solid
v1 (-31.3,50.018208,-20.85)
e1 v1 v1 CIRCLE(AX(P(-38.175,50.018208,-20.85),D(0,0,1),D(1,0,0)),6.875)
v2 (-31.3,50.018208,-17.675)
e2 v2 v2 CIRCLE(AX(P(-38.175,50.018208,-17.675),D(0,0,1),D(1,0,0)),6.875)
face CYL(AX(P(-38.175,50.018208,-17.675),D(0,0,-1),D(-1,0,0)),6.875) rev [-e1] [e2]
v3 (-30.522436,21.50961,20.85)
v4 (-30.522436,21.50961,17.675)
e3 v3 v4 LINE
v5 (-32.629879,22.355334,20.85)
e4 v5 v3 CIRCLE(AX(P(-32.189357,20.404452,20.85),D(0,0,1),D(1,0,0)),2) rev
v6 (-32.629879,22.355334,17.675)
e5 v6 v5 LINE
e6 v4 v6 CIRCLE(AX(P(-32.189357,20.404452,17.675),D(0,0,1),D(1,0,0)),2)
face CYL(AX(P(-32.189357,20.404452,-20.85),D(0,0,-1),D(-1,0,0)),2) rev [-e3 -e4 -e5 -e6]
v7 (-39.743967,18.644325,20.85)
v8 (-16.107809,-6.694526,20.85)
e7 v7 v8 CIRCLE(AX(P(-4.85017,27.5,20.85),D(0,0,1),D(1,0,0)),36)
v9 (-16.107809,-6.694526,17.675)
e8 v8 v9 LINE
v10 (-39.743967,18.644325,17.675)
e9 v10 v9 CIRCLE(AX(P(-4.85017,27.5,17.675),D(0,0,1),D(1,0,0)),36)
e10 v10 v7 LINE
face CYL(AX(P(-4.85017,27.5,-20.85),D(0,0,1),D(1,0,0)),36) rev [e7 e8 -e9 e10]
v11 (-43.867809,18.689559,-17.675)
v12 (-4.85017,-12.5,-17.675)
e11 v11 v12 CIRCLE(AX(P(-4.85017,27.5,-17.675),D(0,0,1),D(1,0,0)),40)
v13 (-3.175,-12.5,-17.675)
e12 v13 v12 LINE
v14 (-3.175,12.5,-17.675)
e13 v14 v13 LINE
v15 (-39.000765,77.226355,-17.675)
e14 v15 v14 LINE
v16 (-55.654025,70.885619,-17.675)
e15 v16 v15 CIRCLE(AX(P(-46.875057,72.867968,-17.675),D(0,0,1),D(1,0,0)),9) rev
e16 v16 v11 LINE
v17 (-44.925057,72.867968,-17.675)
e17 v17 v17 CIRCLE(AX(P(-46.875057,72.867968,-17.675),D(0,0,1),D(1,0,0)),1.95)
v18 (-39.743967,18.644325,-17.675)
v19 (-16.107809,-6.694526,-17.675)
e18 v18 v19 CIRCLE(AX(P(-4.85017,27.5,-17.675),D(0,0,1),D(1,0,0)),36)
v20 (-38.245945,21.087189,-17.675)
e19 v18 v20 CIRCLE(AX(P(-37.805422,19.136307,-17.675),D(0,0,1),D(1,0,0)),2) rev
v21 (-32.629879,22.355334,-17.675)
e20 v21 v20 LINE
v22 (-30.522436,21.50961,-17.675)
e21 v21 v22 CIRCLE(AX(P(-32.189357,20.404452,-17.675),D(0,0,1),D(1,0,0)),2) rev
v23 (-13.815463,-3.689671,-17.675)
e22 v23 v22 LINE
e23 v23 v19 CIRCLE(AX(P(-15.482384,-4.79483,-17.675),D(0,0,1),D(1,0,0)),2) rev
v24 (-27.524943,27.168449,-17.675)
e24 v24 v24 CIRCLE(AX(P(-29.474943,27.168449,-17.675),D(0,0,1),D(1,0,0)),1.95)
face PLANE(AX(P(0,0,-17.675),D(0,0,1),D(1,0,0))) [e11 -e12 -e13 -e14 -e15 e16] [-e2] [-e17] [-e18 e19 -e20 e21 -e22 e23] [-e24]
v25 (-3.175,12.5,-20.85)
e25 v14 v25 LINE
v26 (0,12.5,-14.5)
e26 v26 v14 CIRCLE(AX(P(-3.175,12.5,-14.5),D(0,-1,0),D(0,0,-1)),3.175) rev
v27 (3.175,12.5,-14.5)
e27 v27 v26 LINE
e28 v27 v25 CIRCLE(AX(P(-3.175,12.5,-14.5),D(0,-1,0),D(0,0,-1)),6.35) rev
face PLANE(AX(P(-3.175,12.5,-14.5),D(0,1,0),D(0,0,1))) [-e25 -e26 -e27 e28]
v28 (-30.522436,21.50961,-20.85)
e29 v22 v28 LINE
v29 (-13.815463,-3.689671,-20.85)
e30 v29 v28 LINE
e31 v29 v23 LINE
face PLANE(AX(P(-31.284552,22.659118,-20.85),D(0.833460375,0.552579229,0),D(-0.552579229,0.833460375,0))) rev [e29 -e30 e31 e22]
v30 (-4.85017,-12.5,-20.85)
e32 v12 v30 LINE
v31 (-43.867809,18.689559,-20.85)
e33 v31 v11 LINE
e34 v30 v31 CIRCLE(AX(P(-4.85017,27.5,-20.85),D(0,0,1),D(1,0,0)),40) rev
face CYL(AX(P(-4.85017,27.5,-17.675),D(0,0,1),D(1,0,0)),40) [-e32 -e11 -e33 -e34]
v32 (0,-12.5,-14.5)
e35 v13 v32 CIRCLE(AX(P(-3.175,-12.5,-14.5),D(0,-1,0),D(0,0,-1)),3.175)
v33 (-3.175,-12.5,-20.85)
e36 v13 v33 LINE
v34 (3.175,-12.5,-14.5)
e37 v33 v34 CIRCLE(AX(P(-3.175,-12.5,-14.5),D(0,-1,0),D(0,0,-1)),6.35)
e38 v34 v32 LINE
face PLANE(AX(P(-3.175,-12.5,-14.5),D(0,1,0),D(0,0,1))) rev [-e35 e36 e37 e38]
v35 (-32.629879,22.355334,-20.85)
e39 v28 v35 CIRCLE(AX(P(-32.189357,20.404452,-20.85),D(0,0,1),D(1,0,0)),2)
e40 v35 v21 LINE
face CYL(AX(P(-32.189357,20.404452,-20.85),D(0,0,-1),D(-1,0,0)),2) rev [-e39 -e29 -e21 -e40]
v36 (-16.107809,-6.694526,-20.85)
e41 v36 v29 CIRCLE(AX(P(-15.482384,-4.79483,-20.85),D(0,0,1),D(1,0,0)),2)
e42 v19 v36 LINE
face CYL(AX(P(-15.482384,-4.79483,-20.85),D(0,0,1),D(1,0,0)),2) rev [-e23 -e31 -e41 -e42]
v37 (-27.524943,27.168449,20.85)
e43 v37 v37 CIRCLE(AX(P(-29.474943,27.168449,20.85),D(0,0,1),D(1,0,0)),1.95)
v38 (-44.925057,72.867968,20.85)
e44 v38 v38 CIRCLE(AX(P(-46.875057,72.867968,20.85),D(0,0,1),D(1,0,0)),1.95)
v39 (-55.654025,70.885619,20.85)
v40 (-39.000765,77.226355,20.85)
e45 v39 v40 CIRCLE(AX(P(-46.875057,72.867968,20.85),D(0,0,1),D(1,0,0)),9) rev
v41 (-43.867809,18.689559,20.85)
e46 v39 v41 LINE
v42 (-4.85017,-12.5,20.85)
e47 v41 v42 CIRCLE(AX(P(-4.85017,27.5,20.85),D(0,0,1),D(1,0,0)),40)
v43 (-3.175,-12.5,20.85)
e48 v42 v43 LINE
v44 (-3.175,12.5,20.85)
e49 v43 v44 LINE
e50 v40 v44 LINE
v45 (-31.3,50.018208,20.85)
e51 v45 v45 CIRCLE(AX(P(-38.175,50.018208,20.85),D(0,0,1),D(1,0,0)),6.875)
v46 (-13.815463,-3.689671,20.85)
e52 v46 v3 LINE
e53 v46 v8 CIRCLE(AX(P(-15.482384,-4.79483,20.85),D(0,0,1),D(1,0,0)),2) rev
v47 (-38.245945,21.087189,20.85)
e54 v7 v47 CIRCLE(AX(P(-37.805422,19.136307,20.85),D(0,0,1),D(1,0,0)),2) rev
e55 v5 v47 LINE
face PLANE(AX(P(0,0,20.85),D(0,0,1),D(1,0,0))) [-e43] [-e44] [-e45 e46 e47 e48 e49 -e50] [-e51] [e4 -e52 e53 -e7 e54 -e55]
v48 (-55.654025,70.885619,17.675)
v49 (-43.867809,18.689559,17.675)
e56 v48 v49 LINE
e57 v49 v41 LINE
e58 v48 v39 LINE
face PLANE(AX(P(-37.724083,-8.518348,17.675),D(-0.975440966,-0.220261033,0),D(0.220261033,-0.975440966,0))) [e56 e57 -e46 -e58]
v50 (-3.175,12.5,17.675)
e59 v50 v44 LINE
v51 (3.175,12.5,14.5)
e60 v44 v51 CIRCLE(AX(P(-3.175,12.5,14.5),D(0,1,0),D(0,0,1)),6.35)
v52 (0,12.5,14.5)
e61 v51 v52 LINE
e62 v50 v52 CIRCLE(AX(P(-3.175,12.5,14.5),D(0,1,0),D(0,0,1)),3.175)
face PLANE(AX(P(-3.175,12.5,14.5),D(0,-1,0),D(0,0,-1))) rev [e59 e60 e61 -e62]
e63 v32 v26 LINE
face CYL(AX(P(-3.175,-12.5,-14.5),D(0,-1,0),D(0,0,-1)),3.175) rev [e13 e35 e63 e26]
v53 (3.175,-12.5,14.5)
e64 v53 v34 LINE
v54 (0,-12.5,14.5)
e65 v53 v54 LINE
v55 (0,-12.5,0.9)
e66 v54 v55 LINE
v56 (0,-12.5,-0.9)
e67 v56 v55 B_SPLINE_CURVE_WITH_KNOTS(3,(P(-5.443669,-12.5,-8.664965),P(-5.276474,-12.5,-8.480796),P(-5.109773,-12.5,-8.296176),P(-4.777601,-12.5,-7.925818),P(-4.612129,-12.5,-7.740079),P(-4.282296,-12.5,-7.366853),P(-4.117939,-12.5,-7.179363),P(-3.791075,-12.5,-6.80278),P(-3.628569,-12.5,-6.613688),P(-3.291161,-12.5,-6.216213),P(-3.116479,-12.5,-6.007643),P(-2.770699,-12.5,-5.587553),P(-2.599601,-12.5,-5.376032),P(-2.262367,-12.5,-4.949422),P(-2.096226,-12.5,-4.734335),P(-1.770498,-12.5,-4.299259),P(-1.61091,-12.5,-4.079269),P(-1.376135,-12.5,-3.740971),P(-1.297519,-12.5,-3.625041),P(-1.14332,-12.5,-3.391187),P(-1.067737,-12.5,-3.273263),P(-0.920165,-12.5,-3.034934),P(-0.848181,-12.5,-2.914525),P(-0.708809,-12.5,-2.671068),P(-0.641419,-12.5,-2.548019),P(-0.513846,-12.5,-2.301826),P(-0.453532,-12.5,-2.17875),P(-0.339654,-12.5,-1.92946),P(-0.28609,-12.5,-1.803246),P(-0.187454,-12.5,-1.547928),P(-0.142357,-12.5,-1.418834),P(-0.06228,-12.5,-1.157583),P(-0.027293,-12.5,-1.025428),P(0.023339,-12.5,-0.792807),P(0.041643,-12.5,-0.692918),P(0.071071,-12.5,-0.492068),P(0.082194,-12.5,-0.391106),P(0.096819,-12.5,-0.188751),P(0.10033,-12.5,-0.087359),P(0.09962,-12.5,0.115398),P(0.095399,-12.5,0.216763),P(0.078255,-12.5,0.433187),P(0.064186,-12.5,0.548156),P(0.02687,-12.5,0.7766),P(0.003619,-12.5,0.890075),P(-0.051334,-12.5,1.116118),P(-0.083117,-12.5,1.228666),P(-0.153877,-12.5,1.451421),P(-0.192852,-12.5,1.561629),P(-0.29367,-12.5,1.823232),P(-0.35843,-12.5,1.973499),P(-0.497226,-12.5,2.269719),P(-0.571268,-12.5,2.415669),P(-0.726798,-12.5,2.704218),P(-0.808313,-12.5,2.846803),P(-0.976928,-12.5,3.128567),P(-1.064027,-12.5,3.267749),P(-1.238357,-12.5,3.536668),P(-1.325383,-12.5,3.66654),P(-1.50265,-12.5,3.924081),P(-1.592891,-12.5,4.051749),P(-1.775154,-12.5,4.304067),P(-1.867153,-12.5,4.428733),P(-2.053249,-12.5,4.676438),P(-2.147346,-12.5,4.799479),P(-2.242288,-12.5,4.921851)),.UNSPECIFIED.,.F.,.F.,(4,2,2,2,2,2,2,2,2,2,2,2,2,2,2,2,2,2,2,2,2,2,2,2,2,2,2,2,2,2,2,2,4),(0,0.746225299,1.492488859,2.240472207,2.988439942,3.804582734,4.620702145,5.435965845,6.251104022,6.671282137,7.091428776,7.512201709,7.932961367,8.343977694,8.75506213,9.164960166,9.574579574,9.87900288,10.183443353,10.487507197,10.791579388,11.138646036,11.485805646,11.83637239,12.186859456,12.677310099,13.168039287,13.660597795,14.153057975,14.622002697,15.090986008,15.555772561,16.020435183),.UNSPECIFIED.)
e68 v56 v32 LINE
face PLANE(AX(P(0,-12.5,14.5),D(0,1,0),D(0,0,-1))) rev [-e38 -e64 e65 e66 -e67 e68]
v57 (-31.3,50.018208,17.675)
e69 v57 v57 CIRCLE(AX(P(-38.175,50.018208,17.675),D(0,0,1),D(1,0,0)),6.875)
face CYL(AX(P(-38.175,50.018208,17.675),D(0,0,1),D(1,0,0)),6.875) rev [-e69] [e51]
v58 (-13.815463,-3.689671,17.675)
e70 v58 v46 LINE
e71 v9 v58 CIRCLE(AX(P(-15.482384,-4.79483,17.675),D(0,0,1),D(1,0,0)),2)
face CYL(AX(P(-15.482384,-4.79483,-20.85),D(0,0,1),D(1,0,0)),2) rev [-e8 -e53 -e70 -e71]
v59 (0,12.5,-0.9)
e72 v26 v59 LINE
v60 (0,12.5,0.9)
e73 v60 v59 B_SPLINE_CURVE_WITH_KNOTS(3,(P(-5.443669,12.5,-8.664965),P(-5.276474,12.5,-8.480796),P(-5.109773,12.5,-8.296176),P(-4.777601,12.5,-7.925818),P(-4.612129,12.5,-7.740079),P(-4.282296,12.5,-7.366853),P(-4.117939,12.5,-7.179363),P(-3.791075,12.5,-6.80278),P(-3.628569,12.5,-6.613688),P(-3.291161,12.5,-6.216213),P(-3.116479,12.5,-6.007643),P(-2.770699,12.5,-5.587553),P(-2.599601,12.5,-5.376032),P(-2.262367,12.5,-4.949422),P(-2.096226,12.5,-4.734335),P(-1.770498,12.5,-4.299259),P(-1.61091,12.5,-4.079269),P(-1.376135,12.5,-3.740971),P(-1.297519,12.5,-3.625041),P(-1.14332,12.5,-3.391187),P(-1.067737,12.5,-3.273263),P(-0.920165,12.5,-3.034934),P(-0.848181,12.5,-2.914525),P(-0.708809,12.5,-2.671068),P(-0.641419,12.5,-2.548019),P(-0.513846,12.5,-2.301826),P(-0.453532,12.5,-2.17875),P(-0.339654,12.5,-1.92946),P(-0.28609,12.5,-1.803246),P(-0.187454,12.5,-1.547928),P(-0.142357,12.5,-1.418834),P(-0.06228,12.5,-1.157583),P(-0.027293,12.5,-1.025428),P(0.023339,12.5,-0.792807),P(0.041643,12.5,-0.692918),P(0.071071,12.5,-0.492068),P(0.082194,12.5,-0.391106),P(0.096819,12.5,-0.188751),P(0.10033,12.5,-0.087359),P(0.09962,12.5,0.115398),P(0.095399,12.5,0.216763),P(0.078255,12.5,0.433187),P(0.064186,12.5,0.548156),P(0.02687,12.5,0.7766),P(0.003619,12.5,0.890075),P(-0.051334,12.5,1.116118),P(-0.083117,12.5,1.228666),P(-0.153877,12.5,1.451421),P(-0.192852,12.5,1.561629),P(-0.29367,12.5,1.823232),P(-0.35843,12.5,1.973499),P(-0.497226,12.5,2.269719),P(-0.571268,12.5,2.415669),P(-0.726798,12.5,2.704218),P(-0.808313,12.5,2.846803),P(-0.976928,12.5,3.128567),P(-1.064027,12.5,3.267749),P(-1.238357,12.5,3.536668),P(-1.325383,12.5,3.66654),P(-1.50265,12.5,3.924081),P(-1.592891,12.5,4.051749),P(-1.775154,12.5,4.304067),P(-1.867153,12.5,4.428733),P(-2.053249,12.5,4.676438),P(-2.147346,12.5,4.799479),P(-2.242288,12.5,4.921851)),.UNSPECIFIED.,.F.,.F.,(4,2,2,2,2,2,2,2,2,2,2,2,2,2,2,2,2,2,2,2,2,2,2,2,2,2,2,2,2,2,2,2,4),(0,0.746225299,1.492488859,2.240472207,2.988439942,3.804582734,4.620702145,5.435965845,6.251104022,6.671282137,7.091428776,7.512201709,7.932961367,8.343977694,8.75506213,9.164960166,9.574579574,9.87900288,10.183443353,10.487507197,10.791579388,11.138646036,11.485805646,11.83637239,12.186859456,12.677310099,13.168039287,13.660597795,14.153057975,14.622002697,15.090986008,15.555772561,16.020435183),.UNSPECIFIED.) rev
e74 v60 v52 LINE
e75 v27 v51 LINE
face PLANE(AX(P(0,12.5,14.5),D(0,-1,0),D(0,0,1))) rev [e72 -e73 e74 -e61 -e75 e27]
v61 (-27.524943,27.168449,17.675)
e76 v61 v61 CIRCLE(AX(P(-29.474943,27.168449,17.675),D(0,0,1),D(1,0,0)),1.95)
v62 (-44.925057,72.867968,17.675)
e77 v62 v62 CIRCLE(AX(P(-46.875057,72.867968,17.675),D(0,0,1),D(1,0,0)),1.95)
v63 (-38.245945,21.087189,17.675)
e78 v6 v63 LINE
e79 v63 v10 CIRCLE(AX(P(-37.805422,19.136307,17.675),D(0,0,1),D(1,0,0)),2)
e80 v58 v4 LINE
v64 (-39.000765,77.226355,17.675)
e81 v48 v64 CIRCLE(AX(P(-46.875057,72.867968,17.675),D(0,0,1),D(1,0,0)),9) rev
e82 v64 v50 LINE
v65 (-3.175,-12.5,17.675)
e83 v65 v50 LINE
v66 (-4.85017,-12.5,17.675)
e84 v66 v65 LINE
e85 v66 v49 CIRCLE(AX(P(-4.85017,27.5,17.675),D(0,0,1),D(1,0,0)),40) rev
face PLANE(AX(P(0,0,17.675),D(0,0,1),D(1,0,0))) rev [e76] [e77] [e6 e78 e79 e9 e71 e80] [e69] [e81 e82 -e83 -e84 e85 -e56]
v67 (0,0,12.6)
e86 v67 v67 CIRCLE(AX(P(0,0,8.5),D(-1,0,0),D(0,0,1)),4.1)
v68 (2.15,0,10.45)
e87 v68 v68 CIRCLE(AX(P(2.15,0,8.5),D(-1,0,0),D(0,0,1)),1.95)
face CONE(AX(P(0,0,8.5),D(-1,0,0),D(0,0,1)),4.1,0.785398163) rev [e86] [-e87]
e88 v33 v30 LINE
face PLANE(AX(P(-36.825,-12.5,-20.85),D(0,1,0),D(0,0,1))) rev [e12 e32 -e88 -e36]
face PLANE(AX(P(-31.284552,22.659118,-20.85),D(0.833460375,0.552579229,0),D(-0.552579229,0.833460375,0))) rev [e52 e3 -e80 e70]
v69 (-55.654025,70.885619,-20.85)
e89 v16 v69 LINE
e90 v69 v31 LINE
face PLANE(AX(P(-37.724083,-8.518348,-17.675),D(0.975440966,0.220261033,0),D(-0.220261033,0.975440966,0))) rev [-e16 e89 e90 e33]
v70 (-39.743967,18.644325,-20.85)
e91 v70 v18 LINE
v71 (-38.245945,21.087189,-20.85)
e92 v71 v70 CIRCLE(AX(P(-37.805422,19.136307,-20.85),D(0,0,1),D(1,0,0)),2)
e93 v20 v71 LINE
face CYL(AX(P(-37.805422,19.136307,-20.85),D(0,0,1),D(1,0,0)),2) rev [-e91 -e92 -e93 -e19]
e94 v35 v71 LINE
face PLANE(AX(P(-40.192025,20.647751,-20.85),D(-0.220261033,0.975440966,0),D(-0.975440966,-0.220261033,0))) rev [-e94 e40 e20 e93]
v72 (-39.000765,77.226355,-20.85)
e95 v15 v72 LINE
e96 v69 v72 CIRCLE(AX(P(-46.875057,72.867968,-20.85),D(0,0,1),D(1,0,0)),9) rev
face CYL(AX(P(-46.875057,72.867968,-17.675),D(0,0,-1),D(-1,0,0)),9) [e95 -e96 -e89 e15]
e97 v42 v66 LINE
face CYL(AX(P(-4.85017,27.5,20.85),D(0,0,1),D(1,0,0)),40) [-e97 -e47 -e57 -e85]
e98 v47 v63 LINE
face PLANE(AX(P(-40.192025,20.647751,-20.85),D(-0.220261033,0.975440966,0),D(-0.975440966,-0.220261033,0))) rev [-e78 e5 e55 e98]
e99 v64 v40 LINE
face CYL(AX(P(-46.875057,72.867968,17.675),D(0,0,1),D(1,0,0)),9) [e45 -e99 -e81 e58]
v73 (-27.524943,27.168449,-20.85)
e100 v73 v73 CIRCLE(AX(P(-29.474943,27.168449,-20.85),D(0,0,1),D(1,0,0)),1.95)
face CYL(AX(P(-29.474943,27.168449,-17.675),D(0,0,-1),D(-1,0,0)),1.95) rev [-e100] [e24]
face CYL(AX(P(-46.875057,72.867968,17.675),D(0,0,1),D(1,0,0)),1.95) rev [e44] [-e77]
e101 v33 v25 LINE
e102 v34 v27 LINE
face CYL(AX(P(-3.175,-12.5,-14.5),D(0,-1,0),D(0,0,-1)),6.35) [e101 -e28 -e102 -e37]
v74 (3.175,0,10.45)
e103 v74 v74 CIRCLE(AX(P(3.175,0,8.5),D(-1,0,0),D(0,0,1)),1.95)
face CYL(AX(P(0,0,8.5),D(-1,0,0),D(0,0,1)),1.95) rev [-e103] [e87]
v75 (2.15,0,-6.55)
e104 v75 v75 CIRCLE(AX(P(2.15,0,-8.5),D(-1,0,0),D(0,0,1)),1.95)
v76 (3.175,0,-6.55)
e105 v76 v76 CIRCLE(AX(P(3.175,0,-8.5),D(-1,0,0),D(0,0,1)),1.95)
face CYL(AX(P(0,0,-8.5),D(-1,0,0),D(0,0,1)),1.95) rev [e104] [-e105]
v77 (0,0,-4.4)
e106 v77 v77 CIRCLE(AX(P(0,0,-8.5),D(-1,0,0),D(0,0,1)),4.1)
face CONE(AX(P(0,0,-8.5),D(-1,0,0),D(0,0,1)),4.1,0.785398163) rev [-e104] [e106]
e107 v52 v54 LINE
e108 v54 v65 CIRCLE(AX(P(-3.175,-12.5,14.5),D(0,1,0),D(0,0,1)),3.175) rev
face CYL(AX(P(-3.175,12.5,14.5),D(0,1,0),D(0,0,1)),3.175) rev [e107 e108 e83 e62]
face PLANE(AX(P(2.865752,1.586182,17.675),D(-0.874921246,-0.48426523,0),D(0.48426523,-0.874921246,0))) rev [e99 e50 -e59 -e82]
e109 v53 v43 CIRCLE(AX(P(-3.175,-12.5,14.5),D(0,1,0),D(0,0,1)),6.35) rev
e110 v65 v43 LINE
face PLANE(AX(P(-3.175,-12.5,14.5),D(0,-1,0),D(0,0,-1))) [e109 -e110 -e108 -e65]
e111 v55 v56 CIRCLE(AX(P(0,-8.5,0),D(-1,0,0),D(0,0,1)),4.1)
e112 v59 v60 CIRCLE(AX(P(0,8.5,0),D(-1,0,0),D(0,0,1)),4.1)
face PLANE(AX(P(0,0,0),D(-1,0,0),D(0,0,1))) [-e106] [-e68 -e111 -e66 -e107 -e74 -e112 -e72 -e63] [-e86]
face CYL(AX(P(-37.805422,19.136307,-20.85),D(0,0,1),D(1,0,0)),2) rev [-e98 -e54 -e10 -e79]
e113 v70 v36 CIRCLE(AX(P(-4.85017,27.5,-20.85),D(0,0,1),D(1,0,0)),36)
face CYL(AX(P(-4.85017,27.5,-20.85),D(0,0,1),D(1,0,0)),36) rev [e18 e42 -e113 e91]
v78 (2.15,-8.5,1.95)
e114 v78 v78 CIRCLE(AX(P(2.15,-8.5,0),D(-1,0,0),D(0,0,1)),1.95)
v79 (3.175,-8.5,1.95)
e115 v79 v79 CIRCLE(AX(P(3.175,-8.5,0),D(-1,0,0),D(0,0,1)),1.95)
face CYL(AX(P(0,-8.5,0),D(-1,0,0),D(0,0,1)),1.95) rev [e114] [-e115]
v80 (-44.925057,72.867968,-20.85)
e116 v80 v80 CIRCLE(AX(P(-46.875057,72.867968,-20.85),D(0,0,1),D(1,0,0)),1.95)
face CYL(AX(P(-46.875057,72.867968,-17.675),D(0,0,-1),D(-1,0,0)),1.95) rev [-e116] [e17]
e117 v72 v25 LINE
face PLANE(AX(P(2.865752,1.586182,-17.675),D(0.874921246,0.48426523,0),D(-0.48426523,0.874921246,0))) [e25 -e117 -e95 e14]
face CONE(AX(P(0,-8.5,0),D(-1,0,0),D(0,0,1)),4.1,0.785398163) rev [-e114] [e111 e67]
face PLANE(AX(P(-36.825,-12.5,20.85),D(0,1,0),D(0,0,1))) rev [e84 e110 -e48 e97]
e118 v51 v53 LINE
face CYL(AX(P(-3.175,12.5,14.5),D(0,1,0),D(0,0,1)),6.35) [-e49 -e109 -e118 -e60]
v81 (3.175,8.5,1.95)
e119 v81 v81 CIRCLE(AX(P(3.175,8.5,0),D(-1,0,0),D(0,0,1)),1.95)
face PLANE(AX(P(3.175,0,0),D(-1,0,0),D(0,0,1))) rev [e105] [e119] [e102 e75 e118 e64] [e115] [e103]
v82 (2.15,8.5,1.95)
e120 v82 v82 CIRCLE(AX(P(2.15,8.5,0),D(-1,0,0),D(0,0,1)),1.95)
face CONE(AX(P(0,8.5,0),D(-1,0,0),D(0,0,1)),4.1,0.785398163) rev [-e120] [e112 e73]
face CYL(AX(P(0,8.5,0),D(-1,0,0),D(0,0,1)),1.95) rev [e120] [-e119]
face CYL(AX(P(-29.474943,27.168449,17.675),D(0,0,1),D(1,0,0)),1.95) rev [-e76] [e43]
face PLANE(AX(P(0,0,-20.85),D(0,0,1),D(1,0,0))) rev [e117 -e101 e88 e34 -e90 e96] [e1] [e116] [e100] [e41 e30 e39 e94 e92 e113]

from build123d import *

# Parameters (mm, degrees)
SKETCH2_W                                      = 29
SKETCH2_H                                      = 25
BOSS_EXTRUDE1_DEPTH                            = 6.35
CONVERT_SOLID1_START                           = 3.175
CONVERT_SOLID1_OUTLINE_W                       = 25
CONVERT_SOLID1_OUTLINE_H                       = 29
CONVERT_SOLID1_DEPTH                           = 3.175
CSK_FOR_M3_5_FLAT_HEAD_MACHINE_SCREW1_AT_COUNT = 2
CSK_FOR_M3_5_FLAT_HEAD_MACHINE_SCREW1_AT_PITCH = 12.02081528
CSK_FOR_M3_5_FLAT_HEAD_MACHINE_SCREW_2_COUNT   = 2
CSK_FOR_M3_5_FLAT_HEAD_MACHINE_SCREW_2_PITCH   = 17
CSK_FOR_M3_5_FLAT_HEAD_MACHINE_SCREW_3_COUNT   = 2
CSK_FOR_M3_5_FLAT_HEAD_MACHINE_SCREW_3_PITCH   = 12.02081528
EDGE_FLANGE1_DEPTH                             = 25
EDGE_FLANGE1_BEND_DEPTH                        = 25
SKETCH23_R                                     = 1.95
SKETCH23_R_2                                   = 6.875
BOSS_EXTRUDE2_DEPTH                            = 3.175
FILLET1_R                                      = 40
SKETCH25_R                                     = 1.95
SKETCH25_R_2                                   = 6.875
CUT_EXTRUDE3_DEPTH                             = 108.532674661
FILLET2_R                                      = 2


# Read off the part's stored shape, not the designer's step: Convert-Solid1
# Sheet-metal steps are written as plain solids
with BuildPart() as part:
    # Sketch2 → Boss-Extrude1 (new body)
    with BuildSketch(Plane(origin=(0, 0, 0), x_dir=(0, 0, -1), z_dir=(1, 0, 0))):
        Rectangle(SKETCH2_W, SKETCH2_H)
    extrude(amount=BOSS_EXTRUDE1_DEPTH)

    # Convert-Solid1 outline → Convert-Solid1 (cut)
    with BuildSketch(Plane.YZ.offset(CONVERT_SOLID1_START)):
        Rectangle(CONVERT_SOLID1_OUTLINE_W, CONVERT_SOLID1_OUTLINE_H)
    extrude(amount=CONVERT_SOLID1_DEPTH, mode=Mode.SUBTRACT)

    # Sketch4 → CSK for M3.5 Flat Head Machine Screw1 (revolve, cut)
    with BuildSketch(Plane.ZX.offset(-8.5)):
        Polygon((0, 0), (0, 3.175), (1.95, 3.175), (1.95, 2.15), (4.1, 0), align=None)
    csk_for_m3_5_flat_head_machine_screw1 = revolve(axis=Axis((-6.35, -8.5, 0), (1, 0, 0)), mode=Mode.SUBTRACT)

    # CSK for M3.5 Flat Head Machine Screw1 at: CSK for M3.5 Flat Head Machine Screw1 ×2
    with Locations(*[Vector(0, 0.7071067811865476, 0.7071067811865476) * (i * CSK_FOR_M3_5_FLAT_HEAD_MACHINE_SCREW1_AT_PITCH) for i in range(1, CSK_FOR_M3_5_FLAT_HEAD_MACHINE_SCREW1_AT_COUNT)]):
        add(csk_for_m3_5_flat_head_machine_screw1, mode=Mode.SUBTRACT)

    # CSK for M3.5 Flat Head Machine Screw 2: CSK for M3.5 Flat Head Machine Screw1 ×2
    with Locations(*[(0, i * CSK_FOR_M3_5_FLAT_HEAD_MACHINE_SCREW_2_PITCH, 0) for i in range(1, CSK_FOR_M3_5_FLAT_HEAD_MACHINE_SCREW_2_COUNT)]):
        add(csk_for_m3_5_flat_head_machine_screw1, mode=Mode.SUBTRACT)

    # CSK for M3.5 Flat Head Machine Screw 3: CSK for M3.5 Flat Head Machine Screw1 ×2
    with Locations(*[Vector(0, 0.7071067811865476, -0.7071067811865476) * (i * CSK_FOR_M3_5_FLAT_HEAD_MACHINE_SCREW_3_PITCH) for i in range(1, CSK_FOR_M3_5_FLAT_HEAD_MACHINE_SCREW_3_COUNT)]):
        add(csk_for_m3_5_flat_head_machine_screw1, mode=Mode.SUBTRACT)

    # Edge-Flange1 section (across the edge) → Edge-Flange1 (add)
    with BuildSketch(Plane(origin=(0, 12.5, -17.675), x_dir=(0, 0, 1), z_dir=(0, -1, 0))):
        with BuildLine():
            Line((-3.175, 3.175), (-3.175, 36.825))
            Line((-3.175, 36.825), (0, 36.825))
            Line((0, 36.825), (0, 3.175))
            ThreePointArc((0, 3.175), (0.92993597, 0.92993597), (3.175, 0))
            Line((3.175, 0), (3.175, -3.175))
            ThreePointArc((3.175, -3.175), (-1.315128061, -1.315128061), (-3.175, 3.175))
        make_face()
    extrude(amount=EDGE_FLANGE1_DEPTH)

    # Edge-Flange1 section 2 (across the edge) → Edge-Flange1 bend (add)
    with BuildSketch(Plane(origin=(0, -12.5, 17.675), x_dir=(0, 0, -1), z_dir=(0, 1, 0))):
        with BuildLine():
            Line((-3.175, 3.175), (-3.175, 36.825))
            Line((-3.175, 36.825), (0, 36.825))
            Line((0, 36.825), (0, 3.175))
            ThreePointArc((0, 3.175), (0.92993597, 0.92993597), (3.175, 0))
            Line((3.175, 0), (3.175, -3.175))
            ThreePointArc((3.175, -3.175), (-1.315128061, -1.315128061), (-3.175, 3.175))
        make_face()
    extrude(amount=EDGE_FLANGE1_BEND_DEPTH)

    # Sketch23 → Boss-Extrude2 (add)
    with BuildSketch(Plane.XY.offset(20.85)):
        with BuildLine():
            Line((-3.175, -12.5), (-3.175, 12.5))
            Line((-3.175, 12.5), (-39.000765285, 77.226355048))
            ThreePointArc((-39.000765285, 77.226355048), (-50.077531286, 81.278922457), (-55.654025191, 70.885618681))
            Line((-55.654025191, 70.885618681), (-36.825, -12.5))
            Line((-36.825, -12.5), (-3.175, -12.5))
        make_face()
        with Locations((-46.875056501, 72.867967978)):
            Circle(SKETCH23_R, mode=Mode.SUBTRACT)
        with Locations((-29.474943499, 27.168448642)):
            Circle(SKETCH23_R, mode=Mode.SUBTRACT)
        with Locations((-38.175, 50.01820831)):
            Circle(SKETCH23_R_2, mode=Mode.SUBTRACT)
    boss_extrude2 = extrude(amount=-BOSS_EXTRUDE2_DEPTH)

    # Mirror3: Boss-Extrude2 across plane
    add(boss_extrude2.mirror(Plane.XY))

    # Fillet1
    fillet1_edges = [part.edges().sort_by_distance(p)[0] for p in [
        (-36.825, -12.5, -19.2625),
        (-36.825, -12.5, 19.2625),
    ]]
    fillet(fillet1_edges, radius=FILLET1_R)

    # Sketch25 → Cut-Extrude3 (cut, through all)
    with BuildSketch(Plane.XY.offset(20.85)):
        with Locations((-46.875056501, 72.867967978)):
            Circle(SKETCH25_R)
        with Locations((-38.175, 50.01820831)):
            Circle(SKETCH25_R_2)
        with Locations((-29.474943499, 27.168448642)):
            Circle(SKETCH25_R)
        with BuildLine():
            Line((-40.192024973, 20.647751172), (-31.28455236, 22.659117506))
            Line((-31.28455236, 22.659117506), (-10.974113473, -7.975305792))
            ThreePointArc((-10.974113473, -7.975305792), (-30.042886429, 1.783719979), (-40.192024973, 20.647751172))
        make_face()
    extrude(amount=-CUT_EXTRUDE3_DEPTH, mode=Mode.SUBTRACT)

    # Fillet2
    fillet2_edges = [part.edges().sort_by_distance(p)[0] for p in [
        (-31.28455236, 22.659117506, 19.2625),
        (-10.974113473, -7.975305792, 19.2625),
        (-40.192024973, 20.647751172, 19.2625),
        (-31.28455236, 22.659117506, -19.2625),
        (-10.974113473, -7.975305792, -19.2625),
        (-40.192024973, 20.647751172, -19.2625),
    ]]
    fillet(fillet2_edges, radius=FILLET2_R)


solid = part.part
